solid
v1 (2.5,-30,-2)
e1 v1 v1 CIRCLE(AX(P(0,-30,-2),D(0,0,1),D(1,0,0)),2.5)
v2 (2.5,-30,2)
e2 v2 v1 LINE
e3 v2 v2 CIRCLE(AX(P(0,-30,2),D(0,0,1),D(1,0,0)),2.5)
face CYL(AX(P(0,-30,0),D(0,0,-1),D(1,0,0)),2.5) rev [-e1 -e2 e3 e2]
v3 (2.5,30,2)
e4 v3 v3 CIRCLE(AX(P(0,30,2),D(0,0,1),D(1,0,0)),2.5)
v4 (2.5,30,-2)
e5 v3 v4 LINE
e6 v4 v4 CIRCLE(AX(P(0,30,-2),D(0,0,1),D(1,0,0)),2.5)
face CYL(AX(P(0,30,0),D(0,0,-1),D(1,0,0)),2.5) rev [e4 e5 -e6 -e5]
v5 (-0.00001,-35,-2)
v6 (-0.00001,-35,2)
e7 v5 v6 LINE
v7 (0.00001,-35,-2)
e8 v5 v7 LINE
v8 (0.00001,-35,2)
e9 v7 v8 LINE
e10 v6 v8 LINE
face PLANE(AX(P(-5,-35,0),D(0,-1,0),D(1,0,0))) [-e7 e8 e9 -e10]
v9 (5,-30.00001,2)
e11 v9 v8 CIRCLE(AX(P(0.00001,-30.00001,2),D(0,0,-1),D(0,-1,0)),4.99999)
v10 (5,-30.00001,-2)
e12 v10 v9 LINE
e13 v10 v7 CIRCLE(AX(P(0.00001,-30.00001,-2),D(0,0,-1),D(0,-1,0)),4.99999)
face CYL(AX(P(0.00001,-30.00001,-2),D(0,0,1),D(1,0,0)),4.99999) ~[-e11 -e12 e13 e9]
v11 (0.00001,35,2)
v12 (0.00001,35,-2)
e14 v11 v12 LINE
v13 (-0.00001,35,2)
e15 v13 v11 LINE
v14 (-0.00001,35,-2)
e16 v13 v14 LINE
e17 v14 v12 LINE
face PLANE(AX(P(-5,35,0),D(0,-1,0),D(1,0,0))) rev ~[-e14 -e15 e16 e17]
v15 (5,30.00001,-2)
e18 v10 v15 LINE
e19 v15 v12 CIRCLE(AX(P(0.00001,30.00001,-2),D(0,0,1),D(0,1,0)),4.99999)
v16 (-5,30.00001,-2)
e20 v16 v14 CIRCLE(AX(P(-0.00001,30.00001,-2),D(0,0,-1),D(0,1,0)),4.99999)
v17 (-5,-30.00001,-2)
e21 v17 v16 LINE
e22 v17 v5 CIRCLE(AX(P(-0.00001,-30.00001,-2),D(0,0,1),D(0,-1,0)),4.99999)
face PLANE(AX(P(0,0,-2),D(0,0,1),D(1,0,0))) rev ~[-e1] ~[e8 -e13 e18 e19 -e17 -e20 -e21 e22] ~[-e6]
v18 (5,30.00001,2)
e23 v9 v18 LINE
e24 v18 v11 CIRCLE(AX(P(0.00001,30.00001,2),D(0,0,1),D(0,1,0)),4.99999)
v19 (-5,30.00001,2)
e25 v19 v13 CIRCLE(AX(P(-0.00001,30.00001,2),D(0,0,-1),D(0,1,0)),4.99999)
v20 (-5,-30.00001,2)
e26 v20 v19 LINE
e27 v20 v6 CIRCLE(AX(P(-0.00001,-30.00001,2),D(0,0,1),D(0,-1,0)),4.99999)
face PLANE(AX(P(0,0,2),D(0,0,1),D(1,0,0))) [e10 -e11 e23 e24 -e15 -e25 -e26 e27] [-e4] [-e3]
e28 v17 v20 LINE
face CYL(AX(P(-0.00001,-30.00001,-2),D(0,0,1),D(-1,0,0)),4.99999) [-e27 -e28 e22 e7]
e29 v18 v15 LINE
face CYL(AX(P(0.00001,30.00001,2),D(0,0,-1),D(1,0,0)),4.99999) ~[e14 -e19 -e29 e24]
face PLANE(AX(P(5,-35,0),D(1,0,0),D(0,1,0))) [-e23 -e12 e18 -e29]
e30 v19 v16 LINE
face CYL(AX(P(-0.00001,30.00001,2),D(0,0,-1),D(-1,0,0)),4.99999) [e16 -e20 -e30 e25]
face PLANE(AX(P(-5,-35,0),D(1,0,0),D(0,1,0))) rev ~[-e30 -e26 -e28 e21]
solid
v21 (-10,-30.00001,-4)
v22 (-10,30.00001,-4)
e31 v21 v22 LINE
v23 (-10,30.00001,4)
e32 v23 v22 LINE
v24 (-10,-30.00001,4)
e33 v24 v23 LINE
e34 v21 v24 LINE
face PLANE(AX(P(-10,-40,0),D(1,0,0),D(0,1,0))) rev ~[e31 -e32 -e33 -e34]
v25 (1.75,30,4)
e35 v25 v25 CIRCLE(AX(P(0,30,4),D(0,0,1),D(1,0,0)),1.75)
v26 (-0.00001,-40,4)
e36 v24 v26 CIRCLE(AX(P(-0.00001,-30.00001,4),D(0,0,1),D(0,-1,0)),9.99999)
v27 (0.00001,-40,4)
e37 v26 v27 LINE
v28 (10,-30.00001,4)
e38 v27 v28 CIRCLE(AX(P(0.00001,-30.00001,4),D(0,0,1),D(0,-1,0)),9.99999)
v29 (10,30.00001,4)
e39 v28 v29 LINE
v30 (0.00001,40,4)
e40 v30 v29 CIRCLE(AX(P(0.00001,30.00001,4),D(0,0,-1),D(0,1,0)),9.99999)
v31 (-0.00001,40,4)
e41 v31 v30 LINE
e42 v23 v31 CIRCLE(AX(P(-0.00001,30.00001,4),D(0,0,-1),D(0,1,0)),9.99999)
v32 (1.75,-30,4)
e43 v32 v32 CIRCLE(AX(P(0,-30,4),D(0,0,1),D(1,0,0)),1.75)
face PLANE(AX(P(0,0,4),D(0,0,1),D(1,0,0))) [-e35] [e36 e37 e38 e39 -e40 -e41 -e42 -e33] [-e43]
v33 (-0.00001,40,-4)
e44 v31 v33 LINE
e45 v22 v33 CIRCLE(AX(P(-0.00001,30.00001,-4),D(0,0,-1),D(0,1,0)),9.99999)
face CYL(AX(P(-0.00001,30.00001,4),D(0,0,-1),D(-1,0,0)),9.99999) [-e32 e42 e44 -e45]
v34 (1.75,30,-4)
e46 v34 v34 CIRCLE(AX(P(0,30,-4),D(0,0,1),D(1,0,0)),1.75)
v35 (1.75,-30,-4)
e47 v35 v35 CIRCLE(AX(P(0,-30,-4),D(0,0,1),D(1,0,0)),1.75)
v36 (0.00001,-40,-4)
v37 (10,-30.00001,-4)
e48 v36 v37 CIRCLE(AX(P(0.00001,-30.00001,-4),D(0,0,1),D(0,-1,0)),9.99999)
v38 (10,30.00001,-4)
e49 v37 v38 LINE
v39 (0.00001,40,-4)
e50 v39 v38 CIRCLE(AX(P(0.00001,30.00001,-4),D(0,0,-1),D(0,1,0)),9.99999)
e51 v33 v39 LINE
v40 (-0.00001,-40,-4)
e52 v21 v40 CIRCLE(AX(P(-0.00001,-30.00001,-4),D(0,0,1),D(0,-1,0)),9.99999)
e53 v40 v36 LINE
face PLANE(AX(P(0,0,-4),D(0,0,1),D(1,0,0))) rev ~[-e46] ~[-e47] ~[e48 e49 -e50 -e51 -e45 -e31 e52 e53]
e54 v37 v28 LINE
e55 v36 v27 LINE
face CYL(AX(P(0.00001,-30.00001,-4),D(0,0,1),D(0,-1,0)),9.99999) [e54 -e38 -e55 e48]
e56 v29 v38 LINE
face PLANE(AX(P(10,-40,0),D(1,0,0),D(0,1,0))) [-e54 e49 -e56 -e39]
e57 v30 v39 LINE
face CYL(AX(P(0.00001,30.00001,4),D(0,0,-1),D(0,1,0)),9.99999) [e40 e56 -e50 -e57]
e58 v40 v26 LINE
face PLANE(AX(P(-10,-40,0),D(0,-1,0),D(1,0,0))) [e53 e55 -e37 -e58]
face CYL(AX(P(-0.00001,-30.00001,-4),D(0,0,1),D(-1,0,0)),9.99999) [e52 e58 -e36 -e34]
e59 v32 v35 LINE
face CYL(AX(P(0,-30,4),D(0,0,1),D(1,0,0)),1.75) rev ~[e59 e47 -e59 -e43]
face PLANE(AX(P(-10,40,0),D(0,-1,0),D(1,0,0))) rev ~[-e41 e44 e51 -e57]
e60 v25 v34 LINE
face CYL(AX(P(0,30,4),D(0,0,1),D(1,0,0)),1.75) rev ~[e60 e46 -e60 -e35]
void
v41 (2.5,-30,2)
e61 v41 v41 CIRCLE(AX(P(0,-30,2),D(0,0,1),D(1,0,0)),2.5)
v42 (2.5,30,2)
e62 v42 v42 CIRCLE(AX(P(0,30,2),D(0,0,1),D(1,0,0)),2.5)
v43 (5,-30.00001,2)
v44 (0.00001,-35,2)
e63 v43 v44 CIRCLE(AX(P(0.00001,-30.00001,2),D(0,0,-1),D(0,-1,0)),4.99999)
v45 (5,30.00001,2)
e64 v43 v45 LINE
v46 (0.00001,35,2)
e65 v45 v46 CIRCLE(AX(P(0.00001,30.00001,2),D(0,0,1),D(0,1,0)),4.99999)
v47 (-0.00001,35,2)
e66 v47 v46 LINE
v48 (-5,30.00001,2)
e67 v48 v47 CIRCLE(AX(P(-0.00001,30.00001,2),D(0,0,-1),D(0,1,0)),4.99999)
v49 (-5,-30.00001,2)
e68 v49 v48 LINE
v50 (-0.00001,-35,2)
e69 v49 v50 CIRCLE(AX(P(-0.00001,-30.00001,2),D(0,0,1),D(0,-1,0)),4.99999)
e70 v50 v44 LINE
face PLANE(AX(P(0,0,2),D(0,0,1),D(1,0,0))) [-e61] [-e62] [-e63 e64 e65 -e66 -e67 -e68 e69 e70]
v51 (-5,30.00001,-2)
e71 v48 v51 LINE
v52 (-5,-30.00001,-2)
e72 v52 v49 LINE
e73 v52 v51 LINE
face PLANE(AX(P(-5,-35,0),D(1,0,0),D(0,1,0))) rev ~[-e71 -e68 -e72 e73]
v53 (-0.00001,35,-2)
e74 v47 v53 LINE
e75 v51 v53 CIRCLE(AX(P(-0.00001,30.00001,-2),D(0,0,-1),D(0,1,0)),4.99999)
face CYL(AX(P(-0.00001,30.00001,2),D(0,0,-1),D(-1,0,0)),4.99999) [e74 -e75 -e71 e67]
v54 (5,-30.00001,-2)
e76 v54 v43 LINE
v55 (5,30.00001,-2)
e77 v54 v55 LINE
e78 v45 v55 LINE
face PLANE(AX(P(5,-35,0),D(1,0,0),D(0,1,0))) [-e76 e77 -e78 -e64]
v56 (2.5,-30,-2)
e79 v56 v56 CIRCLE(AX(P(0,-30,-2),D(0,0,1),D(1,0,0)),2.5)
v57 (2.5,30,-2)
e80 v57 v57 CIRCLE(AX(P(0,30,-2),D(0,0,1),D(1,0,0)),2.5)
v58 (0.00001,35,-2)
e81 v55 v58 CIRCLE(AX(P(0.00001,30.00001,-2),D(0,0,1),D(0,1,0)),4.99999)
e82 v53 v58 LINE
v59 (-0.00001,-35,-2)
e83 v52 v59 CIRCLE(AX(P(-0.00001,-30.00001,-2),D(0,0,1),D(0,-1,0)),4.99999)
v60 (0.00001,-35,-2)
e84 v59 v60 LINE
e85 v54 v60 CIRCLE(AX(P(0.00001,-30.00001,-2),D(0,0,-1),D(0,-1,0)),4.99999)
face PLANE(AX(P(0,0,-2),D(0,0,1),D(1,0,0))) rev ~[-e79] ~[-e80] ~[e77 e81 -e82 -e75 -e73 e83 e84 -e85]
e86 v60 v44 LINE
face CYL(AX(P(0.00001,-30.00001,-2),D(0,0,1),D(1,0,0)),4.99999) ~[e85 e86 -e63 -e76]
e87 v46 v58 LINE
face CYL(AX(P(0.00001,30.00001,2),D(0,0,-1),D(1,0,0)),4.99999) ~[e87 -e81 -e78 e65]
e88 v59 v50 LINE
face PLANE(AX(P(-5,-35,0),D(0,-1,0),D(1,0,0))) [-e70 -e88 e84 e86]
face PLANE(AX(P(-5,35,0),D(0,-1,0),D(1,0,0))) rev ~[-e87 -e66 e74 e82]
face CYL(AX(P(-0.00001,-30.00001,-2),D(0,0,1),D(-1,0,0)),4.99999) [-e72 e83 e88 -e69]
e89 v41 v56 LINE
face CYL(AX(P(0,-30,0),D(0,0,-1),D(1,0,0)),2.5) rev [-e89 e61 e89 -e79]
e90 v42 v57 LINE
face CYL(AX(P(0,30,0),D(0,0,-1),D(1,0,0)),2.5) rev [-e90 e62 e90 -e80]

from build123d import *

# Parameters (mm, degrees)
F0_W     = 20
F0_H     = 80
F1_DEPTH = 4
F2_W     = 10
F2_H     = 70
F2_R     = 2.5
F3_DEPTH = 2
F4_R     = 1.75
F5_DEPTH = 8.001
F6_R     = 4.99999
F7_R     = 9.99999


# Not quite as in the source:
# - a fillet or chamfer is up to 0.001 mm smaller than in the source, because OpenCascade refuses the exact size


with BuildPart() as f1:
    # F0 (on Top) → F1 (new body, symmetric)
    with BuildSketch(Plane.XY):
        Rectangle(F0_W, F0_H)
    extrude(amount=F1_DEPTH, both=True)

    # F4 (on face) → F5 (cut, through all)
    with BuildSketch(Plane.XY.offset(4)):
        with Locations((0, 30)):
            Circle(F4_R)
        with Locations((0, -30)):
            Circle(F4_R)
    extrude(amount=-F5_DEPTH, mode=Mode.SUBTRACT)

    # F7 (radius 10 in the source; OpenCascade refuses exactly that, so slightly less here)
    f7_edges = [f1.edges().sort_by_distance(p)[0] for p in [
        (10, 40, 0),
        (-10, 40, 0),
        (-10, -40, 0),
        (10, -40, 0),
    ]]
    fillet(f7_edges, radius=F7_R)


with BuildPart() as f3:
    # F2 (on Top) → F3 (new body, symmetric)
    with BuildSketch(Plane.XY):
        Rectangle(F2_W, F2_H)
        with Locations((0, -30)):
            Circle(F2_R, mode=Mode.SUBTRACT)
        with Locations((0, 30)):
            Circle(F2_R, mode=Mode.SUBTRACT)
    extrude(amount=F3_DEPTH, both=True)

    # F6 (radius 5 in the source; OpenCascade refuses exactly that, so slightly less here)
    f6_edges = [f3.edges().sort_by_distance(p)[0] for p in [
        (5, -35, 0),
        (-5, -35, 0),
        (5, 35, 0),
        (-5, 35, 0),
    ]]
    fillet(f6_edges, radius=F6_R)


with BuildPart() as f1_1:
    add(f1.part)

    # F8: cut F3
    add(f3.part, mode=Mode.SUBTRACT)


solid = Compound([f3.part, f1_1.part])
